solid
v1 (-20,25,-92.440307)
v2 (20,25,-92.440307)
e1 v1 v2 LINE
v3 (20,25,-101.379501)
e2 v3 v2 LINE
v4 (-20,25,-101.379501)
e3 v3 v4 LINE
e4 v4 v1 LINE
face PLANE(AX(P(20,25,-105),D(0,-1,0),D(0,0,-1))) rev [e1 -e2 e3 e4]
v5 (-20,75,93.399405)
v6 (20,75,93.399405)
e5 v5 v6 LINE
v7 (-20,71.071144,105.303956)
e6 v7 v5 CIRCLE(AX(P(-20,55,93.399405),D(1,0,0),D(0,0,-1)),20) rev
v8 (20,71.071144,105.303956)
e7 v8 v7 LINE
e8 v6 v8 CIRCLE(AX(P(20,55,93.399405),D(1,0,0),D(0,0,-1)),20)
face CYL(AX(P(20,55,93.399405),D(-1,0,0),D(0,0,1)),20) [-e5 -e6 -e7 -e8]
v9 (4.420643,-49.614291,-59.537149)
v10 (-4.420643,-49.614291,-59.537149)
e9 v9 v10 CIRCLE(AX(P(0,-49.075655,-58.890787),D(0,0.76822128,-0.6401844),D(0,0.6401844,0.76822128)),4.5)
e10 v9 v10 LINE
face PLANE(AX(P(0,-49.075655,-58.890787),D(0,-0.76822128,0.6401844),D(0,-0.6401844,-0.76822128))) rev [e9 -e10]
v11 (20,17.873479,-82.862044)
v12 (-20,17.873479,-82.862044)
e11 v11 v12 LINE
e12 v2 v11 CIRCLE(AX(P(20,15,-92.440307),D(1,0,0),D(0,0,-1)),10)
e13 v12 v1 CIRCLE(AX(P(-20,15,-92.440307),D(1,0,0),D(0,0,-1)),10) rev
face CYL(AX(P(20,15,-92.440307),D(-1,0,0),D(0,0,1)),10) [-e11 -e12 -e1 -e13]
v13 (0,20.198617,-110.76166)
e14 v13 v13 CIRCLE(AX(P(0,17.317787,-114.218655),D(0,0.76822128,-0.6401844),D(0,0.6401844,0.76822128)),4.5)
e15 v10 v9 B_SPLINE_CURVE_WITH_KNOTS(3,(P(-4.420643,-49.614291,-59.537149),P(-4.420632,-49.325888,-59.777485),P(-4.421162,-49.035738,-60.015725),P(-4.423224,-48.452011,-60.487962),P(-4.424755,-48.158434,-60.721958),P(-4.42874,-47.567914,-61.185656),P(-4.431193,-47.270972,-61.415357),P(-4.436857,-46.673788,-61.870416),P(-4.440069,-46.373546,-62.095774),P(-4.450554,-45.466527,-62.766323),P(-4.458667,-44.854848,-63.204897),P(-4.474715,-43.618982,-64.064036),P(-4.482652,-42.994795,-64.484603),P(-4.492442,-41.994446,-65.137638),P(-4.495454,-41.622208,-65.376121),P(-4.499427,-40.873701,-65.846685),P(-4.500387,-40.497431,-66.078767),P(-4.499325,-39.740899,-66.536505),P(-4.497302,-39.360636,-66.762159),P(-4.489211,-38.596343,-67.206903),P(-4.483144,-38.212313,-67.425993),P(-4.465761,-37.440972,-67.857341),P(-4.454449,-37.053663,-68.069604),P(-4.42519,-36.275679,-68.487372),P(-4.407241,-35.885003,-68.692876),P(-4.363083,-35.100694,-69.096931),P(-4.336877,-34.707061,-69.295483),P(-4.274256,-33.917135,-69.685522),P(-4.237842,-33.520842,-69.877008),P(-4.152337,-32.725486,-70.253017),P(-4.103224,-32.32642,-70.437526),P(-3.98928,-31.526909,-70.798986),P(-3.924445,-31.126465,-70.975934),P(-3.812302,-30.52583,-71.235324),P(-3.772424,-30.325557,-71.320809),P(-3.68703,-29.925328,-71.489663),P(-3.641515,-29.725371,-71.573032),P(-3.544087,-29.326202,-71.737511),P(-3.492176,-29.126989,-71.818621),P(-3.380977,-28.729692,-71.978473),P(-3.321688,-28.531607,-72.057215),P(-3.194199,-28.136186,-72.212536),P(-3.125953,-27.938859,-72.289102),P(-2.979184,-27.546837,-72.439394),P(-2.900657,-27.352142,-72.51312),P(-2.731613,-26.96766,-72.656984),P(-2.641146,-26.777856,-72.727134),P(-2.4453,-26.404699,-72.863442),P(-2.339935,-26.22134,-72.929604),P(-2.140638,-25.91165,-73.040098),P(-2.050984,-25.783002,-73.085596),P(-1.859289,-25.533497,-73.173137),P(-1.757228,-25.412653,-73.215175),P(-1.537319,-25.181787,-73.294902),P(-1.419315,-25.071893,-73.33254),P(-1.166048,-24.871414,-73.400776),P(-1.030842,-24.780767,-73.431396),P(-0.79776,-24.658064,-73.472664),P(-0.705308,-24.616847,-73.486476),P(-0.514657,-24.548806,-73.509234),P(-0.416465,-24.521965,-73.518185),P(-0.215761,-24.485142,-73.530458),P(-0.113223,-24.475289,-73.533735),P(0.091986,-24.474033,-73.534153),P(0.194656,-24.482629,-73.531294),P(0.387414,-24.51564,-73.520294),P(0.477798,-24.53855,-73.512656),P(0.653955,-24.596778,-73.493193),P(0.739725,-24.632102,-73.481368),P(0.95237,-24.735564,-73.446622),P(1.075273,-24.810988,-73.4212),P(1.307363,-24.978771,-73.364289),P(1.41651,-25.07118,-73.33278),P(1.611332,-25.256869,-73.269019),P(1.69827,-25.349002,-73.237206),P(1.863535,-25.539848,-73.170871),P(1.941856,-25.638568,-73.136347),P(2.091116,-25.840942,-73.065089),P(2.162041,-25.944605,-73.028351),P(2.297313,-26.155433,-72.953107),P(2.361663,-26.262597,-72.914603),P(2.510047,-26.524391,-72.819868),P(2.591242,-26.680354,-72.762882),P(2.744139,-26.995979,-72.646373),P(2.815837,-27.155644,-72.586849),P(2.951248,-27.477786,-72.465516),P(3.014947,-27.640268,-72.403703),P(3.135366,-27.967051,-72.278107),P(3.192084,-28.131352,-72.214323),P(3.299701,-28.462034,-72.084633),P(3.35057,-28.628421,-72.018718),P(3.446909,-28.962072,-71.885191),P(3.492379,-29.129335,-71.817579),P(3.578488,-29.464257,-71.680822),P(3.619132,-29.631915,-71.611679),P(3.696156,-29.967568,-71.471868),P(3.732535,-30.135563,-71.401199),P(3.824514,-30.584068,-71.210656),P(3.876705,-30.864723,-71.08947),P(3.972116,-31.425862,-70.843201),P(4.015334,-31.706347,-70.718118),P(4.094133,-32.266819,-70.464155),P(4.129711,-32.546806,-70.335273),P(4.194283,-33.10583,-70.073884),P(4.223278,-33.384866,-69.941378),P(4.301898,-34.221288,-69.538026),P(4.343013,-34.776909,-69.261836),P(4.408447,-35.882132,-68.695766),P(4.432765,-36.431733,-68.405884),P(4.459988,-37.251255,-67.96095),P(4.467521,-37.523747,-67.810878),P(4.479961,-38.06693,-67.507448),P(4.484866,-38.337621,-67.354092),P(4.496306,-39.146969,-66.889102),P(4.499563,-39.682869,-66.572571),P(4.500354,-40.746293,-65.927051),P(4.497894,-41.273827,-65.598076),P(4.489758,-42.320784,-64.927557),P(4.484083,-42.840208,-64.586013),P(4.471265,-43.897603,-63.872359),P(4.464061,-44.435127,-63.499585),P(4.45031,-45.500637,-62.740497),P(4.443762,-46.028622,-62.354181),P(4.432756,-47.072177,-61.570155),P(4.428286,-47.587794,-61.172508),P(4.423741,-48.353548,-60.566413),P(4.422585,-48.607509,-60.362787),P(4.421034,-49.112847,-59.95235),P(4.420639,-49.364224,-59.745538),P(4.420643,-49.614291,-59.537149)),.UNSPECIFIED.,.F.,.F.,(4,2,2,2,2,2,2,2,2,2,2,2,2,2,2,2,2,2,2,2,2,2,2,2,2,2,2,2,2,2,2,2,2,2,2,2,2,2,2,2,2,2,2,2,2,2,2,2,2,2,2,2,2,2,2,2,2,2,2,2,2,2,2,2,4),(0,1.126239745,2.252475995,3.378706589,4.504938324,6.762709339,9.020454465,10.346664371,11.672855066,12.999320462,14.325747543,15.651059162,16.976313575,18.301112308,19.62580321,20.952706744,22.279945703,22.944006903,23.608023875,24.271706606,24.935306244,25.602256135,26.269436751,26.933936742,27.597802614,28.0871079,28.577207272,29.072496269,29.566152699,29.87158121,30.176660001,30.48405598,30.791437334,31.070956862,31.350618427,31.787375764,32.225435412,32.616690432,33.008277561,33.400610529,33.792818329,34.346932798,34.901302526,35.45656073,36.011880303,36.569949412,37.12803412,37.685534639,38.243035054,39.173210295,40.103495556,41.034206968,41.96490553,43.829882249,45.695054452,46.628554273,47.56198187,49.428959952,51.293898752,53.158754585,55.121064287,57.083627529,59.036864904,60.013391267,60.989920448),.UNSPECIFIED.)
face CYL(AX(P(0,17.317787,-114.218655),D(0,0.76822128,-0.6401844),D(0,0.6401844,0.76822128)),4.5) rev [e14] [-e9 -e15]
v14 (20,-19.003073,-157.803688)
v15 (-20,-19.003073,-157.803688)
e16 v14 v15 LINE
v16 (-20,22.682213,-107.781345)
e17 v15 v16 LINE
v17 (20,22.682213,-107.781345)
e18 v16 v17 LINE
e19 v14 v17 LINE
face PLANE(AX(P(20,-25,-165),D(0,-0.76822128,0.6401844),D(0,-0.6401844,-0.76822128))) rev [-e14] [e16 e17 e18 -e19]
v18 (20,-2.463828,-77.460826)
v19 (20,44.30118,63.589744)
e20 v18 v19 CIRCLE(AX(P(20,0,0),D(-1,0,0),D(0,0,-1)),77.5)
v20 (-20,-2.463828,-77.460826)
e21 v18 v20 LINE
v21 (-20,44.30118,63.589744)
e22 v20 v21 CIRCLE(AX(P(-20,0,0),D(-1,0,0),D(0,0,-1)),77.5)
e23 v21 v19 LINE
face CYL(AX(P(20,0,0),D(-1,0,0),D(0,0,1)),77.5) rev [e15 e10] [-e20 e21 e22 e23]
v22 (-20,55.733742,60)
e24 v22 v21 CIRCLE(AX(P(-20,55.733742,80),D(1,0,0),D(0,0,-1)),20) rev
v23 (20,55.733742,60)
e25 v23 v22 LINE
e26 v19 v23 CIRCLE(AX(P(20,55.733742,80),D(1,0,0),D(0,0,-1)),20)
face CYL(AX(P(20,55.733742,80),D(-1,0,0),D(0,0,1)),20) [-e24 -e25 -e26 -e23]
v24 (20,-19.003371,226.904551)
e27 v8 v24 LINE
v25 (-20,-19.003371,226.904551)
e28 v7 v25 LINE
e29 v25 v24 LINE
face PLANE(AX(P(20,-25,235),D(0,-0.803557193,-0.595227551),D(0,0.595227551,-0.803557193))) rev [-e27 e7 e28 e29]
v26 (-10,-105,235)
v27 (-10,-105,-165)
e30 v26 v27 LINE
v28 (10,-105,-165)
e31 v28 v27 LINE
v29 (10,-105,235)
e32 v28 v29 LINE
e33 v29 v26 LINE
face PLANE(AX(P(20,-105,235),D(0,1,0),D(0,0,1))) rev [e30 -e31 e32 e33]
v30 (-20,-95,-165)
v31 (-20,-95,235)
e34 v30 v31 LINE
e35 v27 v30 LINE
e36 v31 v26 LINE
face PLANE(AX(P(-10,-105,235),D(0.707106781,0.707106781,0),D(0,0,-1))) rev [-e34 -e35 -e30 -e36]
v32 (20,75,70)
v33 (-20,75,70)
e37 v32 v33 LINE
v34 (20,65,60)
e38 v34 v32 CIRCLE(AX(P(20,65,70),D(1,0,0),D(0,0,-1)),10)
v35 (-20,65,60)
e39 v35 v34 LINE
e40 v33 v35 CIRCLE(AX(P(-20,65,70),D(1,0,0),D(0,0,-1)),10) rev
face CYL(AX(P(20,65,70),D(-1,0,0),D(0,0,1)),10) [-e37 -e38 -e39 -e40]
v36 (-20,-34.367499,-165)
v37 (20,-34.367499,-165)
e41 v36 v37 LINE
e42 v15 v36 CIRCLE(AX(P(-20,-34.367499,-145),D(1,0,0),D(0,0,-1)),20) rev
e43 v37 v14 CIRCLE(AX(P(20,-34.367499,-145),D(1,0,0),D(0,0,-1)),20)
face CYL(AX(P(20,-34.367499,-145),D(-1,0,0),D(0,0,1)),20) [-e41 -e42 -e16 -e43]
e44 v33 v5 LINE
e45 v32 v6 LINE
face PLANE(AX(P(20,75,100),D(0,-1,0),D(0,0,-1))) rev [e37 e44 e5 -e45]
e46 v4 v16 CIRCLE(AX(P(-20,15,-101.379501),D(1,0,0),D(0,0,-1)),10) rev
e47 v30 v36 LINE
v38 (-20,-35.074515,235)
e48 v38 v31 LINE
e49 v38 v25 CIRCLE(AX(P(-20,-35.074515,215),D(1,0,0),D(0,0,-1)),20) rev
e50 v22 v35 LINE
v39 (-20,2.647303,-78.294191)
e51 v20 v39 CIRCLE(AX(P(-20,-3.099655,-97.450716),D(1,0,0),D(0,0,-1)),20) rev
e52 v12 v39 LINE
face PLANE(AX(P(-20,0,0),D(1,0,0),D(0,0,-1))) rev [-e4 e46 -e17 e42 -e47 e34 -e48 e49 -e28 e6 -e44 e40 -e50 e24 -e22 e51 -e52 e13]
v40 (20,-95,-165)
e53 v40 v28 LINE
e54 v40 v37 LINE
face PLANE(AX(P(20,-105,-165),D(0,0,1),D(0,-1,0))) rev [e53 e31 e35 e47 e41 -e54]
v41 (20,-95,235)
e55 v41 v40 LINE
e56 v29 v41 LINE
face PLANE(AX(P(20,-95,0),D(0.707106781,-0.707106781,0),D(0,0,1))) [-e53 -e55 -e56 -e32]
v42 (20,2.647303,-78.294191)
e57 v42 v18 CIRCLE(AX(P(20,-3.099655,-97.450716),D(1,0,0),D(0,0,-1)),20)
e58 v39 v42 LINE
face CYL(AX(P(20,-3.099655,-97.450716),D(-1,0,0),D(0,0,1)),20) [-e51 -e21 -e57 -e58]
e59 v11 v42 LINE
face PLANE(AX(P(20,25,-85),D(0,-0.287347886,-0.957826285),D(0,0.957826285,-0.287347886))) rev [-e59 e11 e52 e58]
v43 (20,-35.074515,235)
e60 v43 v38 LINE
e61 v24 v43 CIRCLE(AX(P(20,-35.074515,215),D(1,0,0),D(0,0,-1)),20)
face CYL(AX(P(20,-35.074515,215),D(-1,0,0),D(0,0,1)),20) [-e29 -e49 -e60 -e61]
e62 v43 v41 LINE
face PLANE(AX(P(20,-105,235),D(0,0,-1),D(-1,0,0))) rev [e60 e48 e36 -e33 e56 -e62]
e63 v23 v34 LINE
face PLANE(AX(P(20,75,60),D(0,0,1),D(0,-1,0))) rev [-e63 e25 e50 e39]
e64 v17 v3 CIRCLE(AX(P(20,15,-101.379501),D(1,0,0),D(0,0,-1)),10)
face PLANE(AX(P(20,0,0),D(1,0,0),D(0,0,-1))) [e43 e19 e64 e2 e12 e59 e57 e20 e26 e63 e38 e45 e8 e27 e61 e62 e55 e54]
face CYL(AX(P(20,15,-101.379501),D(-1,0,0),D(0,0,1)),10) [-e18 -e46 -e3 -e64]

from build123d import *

# Parameters (mm, degrees)
EXTRUDE_1_DEPTH     = 20
M10X1_0_1_OUTLINE_R = 4.5
M10X1_0_1_DEPTH     = 86.424893955
FILLET_1_R          = 10
FILLET_2_R          = 20
CHAMFER_1_SIZE      = 10


# Read off the part's stored shape, not the designer's step: M10x1.0 螺纹孔1
with BuildPart() as part:
    # 草图1 → 凸台-拉伸1 (new, symmetric)
    with BuildSketch(Plane(origin=(0, 0, 0), x_dir=(0, 0, -1), z_dir=(1, 0, 0))):
        with BuildLine():
            Line((-235, -105), (165, -105))
            Line((165, -105), (165, -25))
            Line((165, -25), (105, 25))
            Line((105, 25), (85, 25))
            Line((85, 25), (77.5, 0))
            ThreePointArc((77.5, 0), (-26.04083332, -72.994006603), (-60, 49.053542176))
            Line((-60, 49.053542176), (-60, 75))
            Line((-60, 75), (-100, 75))
            Line((-100, 75), (-235, -25))
            Line((-235, -25), (-235, -105))
        make_face()
    extrude(amount=EXTRUDE_1_DEPTH, both=True)

    # M10x1.0 螺纹孔1 outline → M10x1.0 螺纹孔1 (cut)
    with BuildSketch(Plane(origin=(0, 0, 0), x_dir=(1, 0, 0), z_dir=(0, 0.7682212795973757, -0.6401843996644799))):
        with Locations((0, 76.658624366)):
            Circle(M10X1_0_1_OUTLINE_R)
    extrude(amount=M10X1_0_1_DEPTH, mode=Mode.SUBTRACT)

    # 圆角1
    fillet_1_edges = [part.edges().sort_by_distance(p)[0] for p in [
        (0, 75, 60),
        (0, 25, -85),
        (0, 25, -105),
    ]]
    fillet(fillet_1_edges, radius=FILLET_1_R)

    # 圆角2
    fillet_2_edges = [part.edges().sort_by_distance(p)[0] for p in [
        (0, -25, 235),
        (0, 75, 100),
        (0, 49.053542176, 60),
        (0, 0, -77.5),
        (0, -25, -165),
    ]]
    fillet(fillet_2_edges, radius=FILLET_2_R)

    # 倒角1
    chamfer_1_edges = [part.edges().sort_by_distance(p)[0] for p in [
        (-20, -105, 35),
        (20, -105, 35),
    ]]
    chamfer(chamfer_1_edges, length=CHAMFER_1_SIZE)


solid = part.part
